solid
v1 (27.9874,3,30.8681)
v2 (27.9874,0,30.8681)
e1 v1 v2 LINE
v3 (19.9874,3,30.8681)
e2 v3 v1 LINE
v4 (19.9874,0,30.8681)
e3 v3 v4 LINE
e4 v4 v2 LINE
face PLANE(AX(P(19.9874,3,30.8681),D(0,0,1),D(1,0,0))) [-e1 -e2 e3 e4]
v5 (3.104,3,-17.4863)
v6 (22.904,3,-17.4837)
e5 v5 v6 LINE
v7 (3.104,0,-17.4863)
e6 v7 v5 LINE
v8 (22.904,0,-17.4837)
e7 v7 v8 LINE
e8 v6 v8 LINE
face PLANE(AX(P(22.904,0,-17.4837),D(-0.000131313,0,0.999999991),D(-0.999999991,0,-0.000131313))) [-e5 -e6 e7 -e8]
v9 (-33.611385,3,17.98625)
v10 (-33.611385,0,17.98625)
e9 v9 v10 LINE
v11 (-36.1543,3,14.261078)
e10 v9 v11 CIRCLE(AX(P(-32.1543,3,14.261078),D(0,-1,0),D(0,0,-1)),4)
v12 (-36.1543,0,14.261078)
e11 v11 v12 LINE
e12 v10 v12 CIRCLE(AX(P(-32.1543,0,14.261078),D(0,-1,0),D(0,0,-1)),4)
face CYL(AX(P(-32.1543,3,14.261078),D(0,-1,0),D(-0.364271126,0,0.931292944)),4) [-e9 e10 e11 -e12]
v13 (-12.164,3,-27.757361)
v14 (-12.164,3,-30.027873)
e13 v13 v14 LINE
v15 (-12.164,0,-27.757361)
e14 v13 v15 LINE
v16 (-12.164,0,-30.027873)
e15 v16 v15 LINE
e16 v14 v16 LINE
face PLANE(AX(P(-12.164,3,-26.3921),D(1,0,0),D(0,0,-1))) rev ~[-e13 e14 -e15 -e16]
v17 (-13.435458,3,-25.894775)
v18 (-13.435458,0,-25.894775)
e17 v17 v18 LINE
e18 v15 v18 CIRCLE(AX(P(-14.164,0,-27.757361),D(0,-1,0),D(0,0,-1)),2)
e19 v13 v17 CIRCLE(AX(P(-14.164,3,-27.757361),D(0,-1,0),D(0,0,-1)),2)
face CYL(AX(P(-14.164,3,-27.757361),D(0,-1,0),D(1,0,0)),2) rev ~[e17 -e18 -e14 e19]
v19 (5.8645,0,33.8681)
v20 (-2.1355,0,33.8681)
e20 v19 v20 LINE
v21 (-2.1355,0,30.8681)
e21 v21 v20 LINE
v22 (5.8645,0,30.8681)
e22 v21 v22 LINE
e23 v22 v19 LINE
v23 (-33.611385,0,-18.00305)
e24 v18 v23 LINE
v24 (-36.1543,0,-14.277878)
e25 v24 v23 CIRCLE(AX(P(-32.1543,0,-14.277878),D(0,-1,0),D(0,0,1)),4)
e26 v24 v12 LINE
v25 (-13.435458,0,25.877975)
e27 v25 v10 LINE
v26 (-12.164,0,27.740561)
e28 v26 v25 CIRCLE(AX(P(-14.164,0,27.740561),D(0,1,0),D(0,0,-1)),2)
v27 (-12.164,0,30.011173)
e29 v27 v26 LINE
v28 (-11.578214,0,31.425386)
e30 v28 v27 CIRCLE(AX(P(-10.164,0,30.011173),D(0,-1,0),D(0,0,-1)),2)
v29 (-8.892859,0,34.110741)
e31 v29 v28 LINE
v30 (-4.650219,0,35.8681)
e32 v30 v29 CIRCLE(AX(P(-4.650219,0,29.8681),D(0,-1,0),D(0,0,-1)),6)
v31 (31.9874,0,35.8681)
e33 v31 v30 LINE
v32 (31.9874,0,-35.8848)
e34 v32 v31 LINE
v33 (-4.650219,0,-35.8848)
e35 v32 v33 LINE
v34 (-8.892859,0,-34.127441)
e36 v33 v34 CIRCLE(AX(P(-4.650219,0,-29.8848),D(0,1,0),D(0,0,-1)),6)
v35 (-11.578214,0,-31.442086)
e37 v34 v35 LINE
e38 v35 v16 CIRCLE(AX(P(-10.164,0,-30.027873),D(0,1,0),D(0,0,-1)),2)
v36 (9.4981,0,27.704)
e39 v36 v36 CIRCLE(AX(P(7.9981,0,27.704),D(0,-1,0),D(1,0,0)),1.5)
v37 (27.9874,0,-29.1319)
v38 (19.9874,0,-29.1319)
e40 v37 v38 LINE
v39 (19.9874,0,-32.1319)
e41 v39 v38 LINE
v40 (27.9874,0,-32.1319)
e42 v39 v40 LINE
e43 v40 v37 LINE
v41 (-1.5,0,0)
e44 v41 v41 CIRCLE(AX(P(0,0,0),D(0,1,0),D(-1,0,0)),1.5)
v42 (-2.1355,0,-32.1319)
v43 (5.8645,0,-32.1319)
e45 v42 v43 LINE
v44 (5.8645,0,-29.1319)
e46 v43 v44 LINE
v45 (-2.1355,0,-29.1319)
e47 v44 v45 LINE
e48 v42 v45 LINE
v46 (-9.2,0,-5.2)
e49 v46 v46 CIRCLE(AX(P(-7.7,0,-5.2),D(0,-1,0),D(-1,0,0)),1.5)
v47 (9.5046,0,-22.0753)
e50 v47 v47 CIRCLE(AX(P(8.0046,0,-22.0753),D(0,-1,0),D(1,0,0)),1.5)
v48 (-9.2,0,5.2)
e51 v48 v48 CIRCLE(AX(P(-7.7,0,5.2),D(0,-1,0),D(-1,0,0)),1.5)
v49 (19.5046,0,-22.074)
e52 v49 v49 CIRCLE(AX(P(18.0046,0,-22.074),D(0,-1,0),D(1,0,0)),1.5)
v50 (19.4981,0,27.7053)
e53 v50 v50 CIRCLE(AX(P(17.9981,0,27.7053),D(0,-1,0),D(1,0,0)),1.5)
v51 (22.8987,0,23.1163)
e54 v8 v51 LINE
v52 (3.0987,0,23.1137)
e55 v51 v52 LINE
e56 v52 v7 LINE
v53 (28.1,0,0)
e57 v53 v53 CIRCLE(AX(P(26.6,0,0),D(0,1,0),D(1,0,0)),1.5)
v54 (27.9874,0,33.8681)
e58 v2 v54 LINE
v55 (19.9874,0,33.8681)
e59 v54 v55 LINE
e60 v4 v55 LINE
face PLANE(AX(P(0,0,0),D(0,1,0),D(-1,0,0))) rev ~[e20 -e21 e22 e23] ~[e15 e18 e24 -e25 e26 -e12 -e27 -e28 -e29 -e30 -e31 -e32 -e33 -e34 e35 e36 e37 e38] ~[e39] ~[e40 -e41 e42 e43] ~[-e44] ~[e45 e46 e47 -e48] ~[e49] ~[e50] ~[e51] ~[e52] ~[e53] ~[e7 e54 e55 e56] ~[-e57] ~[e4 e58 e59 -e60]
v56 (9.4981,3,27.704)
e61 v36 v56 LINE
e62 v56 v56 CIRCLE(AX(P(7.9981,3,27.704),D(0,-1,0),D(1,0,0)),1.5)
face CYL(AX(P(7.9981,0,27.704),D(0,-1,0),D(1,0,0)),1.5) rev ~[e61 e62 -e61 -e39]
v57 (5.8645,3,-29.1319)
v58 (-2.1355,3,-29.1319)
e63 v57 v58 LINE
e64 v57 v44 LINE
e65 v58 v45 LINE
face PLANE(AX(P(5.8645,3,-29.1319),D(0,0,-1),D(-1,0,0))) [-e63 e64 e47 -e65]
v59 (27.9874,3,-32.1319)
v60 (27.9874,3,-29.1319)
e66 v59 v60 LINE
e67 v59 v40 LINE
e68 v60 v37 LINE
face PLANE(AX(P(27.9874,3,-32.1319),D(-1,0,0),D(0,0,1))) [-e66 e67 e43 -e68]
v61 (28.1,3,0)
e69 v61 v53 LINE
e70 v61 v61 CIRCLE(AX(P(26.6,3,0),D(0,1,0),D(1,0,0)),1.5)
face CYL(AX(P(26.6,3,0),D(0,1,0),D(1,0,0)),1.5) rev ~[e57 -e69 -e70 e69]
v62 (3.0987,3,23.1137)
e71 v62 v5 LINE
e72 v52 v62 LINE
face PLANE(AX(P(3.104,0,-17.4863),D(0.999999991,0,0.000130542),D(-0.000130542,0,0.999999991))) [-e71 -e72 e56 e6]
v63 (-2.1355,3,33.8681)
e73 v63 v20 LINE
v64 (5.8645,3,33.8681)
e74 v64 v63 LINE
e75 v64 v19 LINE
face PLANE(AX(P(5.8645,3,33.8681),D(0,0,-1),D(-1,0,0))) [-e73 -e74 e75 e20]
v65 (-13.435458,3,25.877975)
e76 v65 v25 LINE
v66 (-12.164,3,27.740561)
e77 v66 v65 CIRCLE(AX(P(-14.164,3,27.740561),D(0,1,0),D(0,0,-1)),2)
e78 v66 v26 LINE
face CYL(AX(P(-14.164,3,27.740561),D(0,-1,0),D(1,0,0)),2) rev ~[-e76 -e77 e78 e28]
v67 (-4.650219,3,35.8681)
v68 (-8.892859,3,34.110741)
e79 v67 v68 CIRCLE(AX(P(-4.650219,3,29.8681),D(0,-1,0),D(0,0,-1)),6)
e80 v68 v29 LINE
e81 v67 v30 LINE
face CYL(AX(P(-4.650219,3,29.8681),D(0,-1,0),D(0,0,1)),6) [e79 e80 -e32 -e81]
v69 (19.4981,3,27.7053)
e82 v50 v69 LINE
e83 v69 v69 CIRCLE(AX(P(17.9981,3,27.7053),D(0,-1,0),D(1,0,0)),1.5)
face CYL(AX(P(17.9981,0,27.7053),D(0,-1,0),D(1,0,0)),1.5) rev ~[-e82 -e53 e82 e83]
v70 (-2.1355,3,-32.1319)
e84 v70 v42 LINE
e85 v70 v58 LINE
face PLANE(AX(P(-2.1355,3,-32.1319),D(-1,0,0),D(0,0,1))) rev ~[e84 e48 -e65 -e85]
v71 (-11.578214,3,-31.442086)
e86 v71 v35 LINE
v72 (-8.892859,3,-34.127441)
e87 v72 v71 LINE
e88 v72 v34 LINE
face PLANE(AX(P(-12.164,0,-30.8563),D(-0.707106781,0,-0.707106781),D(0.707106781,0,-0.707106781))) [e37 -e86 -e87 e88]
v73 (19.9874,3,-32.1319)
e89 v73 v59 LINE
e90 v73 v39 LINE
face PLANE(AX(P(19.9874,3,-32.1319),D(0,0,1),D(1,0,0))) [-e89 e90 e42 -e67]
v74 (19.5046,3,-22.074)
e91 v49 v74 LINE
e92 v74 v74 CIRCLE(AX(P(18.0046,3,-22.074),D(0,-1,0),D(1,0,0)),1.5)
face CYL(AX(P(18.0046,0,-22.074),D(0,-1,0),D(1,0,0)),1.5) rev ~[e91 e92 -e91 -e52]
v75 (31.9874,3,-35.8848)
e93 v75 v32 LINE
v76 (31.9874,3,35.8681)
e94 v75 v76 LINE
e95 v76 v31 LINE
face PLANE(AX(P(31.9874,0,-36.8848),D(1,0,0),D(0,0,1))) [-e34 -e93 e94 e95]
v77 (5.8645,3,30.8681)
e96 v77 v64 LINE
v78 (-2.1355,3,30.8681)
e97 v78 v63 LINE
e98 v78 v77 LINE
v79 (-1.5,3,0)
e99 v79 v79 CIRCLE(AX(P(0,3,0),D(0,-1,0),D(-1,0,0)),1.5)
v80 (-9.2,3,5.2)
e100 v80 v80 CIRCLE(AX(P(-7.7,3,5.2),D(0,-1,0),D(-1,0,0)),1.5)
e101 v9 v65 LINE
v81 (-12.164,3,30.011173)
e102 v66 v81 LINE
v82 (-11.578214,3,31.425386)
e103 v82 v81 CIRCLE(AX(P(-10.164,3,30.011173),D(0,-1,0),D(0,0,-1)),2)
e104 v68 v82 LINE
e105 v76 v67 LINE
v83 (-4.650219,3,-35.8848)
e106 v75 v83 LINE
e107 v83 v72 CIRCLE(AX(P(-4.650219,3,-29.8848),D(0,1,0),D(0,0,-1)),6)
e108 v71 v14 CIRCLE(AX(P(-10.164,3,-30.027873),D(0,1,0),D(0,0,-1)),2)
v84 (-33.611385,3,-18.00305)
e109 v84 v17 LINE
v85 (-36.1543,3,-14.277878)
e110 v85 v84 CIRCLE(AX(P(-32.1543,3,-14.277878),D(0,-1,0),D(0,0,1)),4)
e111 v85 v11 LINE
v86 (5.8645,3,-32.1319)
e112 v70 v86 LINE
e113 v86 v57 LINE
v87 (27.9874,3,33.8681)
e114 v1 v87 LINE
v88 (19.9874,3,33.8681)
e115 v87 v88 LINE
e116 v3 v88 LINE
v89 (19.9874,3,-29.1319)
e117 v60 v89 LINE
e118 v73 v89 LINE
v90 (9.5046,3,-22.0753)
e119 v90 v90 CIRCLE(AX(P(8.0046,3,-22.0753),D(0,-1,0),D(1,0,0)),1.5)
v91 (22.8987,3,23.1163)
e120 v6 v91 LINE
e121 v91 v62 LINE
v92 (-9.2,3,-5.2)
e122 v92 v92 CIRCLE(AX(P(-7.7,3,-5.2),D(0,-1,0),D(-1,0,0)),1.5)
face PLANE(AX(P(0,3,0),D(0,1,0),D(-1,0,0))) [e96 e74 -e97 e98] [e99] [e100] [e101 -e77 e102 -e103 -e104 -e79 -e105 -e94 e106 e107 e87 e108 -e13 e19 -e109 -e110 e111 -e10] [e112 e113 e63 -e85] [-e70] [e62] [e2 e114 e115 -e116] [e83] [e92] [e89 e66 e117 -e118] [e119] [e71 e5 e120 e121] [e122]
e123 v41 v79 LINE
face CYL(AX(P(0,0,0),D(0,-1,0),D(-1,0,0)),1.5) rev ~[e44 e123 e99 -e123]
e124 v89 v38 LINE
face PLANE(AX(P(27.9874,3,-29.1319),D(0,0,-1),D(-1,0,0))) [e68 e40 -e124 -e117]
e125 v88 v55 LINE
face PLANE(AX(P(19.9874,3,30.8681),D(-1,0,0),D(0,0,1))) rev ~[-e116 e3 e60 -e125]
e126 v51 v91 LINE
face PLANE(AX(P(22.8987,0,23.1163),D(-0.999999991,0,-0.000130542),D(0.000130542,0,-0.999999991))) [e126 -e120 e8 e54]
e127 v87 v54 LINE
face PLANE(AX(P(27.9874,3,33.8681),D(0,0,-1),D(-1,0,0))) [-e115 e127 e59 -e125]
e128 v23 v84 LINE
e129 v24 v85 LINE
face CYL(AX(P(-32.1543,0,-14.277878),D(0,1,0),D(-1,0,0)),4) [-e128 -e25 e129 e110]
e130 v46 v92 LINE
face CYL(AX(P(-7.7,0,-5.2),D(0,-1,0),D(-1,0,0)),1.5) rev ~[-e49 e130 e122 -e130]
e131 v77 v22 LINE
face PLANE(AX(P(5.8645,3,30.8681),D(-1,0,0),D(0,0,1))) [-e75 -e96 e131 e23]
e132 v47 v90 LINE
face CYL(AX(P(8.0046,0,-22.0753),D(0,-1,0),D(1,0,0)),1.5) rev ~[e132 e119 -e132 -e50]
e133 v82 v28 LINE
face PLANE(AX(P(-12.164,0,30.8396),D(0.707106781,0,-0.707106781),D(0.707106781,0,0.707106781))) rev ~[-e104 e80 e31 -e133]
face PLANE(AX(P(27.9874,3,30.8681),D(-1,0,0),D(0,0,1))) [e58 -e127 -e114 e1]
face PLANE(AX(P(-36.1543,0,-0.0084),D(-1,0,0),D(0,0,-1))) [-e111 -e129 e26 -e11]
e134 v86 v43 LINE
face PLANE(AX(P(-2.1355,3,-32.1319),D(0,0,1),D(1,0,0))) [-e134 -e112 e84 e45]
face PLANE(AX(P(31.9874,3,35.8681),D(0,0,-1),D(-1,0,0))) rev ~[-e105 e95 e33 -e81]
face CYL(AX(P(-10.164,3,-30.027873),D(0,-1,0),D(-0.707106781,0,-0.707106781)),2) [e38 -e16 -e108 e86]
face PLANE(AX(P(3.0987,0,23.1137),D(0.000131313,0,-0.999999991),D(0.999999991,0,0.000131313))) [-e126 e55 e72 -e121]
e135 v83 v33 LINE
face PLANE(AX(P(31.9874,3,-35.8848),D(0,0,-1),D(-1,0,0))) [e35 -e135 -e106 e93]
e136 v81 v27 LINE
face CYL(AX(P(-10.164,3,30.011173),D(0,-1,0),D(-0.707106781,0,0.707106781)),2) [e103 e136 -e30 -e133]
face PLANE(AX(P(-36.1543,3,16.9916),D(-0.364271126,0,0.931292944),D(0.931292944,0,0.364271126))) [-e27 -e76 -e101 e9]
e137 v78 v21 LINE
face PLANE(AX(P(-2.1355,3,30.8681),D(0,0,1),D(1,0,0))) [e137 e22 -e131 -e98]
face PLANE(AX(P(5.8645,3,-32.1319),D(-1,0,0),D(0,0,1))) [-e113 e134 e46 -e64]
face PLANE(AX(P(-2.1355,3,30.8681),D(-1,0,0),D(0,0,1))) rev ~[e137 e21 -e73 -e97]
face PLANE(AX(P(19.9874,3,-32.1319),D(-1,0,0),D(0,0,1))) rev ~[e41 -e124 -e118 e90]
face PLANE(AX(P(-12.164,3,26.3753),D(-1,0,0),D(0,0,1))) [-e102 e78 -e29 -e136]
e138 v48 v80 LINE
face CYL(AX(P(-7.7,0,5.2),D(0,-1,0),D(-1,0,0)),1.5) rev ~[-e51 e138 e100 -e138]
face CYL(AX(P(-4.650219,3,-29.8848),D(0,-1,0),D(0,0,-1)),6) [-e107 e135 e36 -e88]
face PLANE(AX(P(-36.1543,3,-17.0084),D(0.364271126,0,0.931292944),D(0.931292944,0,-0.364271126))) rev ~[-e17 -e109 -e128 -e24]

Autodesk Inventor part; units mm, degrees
ref_plane "YZ Plane" through (0, 0, 0) normal (1, 0, 0) x (0, 1, 0)
ref_plane "XZ Plane" through (0, 0, 0) normal (0, 1, 0) x (-1, 0, 0)
ref_plane "XY Plane" through (0, 0, 0) normal (0, 0, 1) x (1, 0, 0)
sketch "Sketch1" plane through (0, 0, 0) normal (0, 1, 0) x (-1, 0, 0)
  circle A0 centre (7.7, 5.2) radius 1.5
  circle A1 centre (7.7, -5.2) radius 1.5
  circle A2 centre (0, 0) radius 1.5
  line L0 (37.8003, -0.0084) -> (-30.1744, -0.0084) construction
  line L1 (-27.0022, -36.8848) -> (-27.0022, -0.0084)
  line L2 (12.164, -30.8563) -> (6.1355, -36.8848)
  line L3 (-27.0022, -36.8848) -> (6.1355, -36.8848)
  line L4 (36.1543, -0.0084) -> (36.1543, -17.0084)
  line L5 (36.1543, -17.0084) -> (12.164, -30.8563)
  line L6 (-27.0022, 36.8681) -> (-27.0022, -0.0084)
  line L7 (12.164, 30.8396) -> (6.1355, 36.8681)
  line L8 (-27.0022, 36.8681) -> (6.1355, 36.8681)
  line L9 (36.1543, -0.0084) -> (36.1543, 16.9916)
  line L10 (36.1543, 16.9916) -> (12.164, 30.8396)
extrude "Extrusion1" add sketch "Sketch1" along normal blind 3
sketch "Sketch2" plane through (0, 3, 0) normal (0, 1, 0) x (1, 0, 0)
  circle A0 centre (13, 13.115) radius 3.5
  point P0 (0, 0)
  dimension "d2" = 7
  dimension "d3" = 13.115
  dimension "d4" = 13
extrude "Extrusion2" cut sketch "Sketch2" against normal through all
move faces "Move1" translate (0.9995, 0, 0) faces at (27.0022, 1, -12.3005)
sketch "Sketch5" plane through (0, 0, 0) normal (0, -1, 0) x (1, 0, 0)
  circle A0 centre (18.0046, -22.074) radius 1.5
  circle A1 centre (8.0046, -22.0753) radius 1.5
  circle A2 centre (17.9981, 27.7053) radius 1.5
  circle A3 centre (7.9981, 27.704) radius 1.5
  line L0 (22.8987, 23.1163) -> (22.904, -17.4837)
  line L1 (22.904, -17.4837) -> (3.104, -17.4863)
  line L2 (3.0987, 23.1137) -> (22.8987, 23.1163)
  line L3 (3.104, -17.4863) -> (3.0987, 23.1137)
  point P0 (0, 0)
extrude "Extrusion4" cut sketch "Sketch5" against normal through all
sketch "Sketch6" plane through (0, 3, 0) normal (0, 1, 0) x (1, 0, 0)
  circle A0 centre (0, 0) radius 1.5
  circle A1 centre (26.6, 0) radius 1.5
  dimension "d22" = 3
  dimension "d23" = 26.6
move faces "Move2" translate (3.9857, 0, 0) faces at (28.0017, 1, -12.3005)
extrude "Extrusion5" cut sketch "Sketch6" against normal through all
sketch "Sketch7" plane through (0, 3, 0) normal (0, 1, 0) x (1, 0, 0)
  line L0 (27.9874, -33.8681) -> (19.9874, -33.8681)
  line L1 (19.9874, -30.8681) -> (19.9874, -33.8681)
  line L2 (27.9874, -30.8681) -> (27.9874, -33.8681)
  line L3 (19.9874, -30.8681) -> (27.9874, -30.8681)
  line L4 (5.8645, -33.8681) -> (-2.1355, -33.8681)
  line L5 (-2.1355, -30.8681) -> (-2.1355, -33.8681)
  line L6 (-2.1355, -30.8681) -> (5.8645, -30.8681)
  line L7 (5.8645, -30.8681) -> (5.8645, -33.8681)
  line L8 (-2.1355, 32.1319) -> (5.8645, 32.1319)
  line L9 (5.8645, 29.1319) -> (-2.1355, 29.1319)
  line L10 (5.8645, 32.1319) -> (5.8645, 29.1319)
  line L11 (-2.1355, 32.1319) -> (-2.1355, 29.1319)
  line L12 (19.9874, 32.1319) -> (19.9874, 29.1319)
  line L13 (27.9874, 32.1319) -> (27.9874, 29.1319)
  line L14 (27.9874, 29.1319) -> (19.9874, 29.1319)
  line L15 (19.9874, 32.1319) -> (27.9874, 32.1319)
  point P0 (0, 0)
  point P1 (31.9874, -36.8681)
extrude "Extrusion6" cut sketch "Sketch7" against normal through all
sketch "Sketch8" plane through (0, 3, 0) normal (0, 1, 0) x (1, 0, 0)
  line L0 (5.8645, -33.8681) -> (-2.1355, -33.8681) projected
  line L1 (-2.1355, -35.8681) -> (-2.1355, -36.8681) construction
  line L2 (-2.1355, 32.1319) -> (5.8645, 32.1319) construction
  line L3 (31.9874, 35.8848) -> (-7.1355, 35.8848)
  line L4 (31.9874, -35.8681) -> (-7.1355, -35.8681)
  line L5 (31.9874, -36.8681) -> (31.9874, -35.8681)
  line L6 (31.9874, 35.8848) -> (31.9874, 36.8848)
  line L7 (-6.1355, 36.8848) -> (-7.1355, 35.8848)
  line L8 (-6.1355, -36.8681) -> (-7.1355, -35.8681)
  line L9 (-6.1355, -36.8681) -> (31.9874, -36.8681)
  line L10 (-6.1355, 36.8848) -> (31.9874, 36.8848)
  point P0 (0, 0)
  dimension "d32" = 2
extrude "Extrusion7" cut sketch "Sketch8" against normal through all
sketch "Sketch9" plane through (0, 3, 0) normal (0, 1, 0) x (1, 0, 0)
  line L0 (-12.164, 30.8563) -> (-12.164, 14.1606) construction
  line L1 (-12.164, 26.3921) -> (-12.164, 30.8563)
  line L2 (-36.1543, 17.0084) -> (-12.164, 30.8563) projected
  line L3 (-36.1543, 17.0084) -> (-12.164, 30.8563)
  line L4 (-36.1543, 17.0084) -> (-12.164, 26.3921)
  line L5 (-41.6853, 0) -> (0, 0) construction
  line L6 (-12.164, -30.8396) -> (-12.164, -14.1438) construction
  line L7 (-12.164, -26.3753) -> (-12.164, -30.8396)
  line L8 (-36.1543, -16.9916) -> (-12.164, -30.8396)
  line L9 (-36.1543, -16.9916) -> (-12.164, -26.3753)
extrude "Extrusion8" cut sketch "Sketch9" against normal up to next
fillet "Fillet1" radius 6 2 edges at (-7.1355, 1.5, -35.8848) (-7.1355, 1.5, 35.8681)
fillet "Fillet2" radius 2 4 edges at (-12.164, 1.5, -26.3921) (-12.164, 1.5, 26.3753) (-12.164, 1.5, 30.8396) (-12.164, 1.5, -30.8563)
fillet "Fillet3" radius 4 2 edges at (-36.1543, 1.5, 16.9916) (-36.1543, 1.5, -17.0084)
properties part number "Dock bot2" material "Acrylic"
